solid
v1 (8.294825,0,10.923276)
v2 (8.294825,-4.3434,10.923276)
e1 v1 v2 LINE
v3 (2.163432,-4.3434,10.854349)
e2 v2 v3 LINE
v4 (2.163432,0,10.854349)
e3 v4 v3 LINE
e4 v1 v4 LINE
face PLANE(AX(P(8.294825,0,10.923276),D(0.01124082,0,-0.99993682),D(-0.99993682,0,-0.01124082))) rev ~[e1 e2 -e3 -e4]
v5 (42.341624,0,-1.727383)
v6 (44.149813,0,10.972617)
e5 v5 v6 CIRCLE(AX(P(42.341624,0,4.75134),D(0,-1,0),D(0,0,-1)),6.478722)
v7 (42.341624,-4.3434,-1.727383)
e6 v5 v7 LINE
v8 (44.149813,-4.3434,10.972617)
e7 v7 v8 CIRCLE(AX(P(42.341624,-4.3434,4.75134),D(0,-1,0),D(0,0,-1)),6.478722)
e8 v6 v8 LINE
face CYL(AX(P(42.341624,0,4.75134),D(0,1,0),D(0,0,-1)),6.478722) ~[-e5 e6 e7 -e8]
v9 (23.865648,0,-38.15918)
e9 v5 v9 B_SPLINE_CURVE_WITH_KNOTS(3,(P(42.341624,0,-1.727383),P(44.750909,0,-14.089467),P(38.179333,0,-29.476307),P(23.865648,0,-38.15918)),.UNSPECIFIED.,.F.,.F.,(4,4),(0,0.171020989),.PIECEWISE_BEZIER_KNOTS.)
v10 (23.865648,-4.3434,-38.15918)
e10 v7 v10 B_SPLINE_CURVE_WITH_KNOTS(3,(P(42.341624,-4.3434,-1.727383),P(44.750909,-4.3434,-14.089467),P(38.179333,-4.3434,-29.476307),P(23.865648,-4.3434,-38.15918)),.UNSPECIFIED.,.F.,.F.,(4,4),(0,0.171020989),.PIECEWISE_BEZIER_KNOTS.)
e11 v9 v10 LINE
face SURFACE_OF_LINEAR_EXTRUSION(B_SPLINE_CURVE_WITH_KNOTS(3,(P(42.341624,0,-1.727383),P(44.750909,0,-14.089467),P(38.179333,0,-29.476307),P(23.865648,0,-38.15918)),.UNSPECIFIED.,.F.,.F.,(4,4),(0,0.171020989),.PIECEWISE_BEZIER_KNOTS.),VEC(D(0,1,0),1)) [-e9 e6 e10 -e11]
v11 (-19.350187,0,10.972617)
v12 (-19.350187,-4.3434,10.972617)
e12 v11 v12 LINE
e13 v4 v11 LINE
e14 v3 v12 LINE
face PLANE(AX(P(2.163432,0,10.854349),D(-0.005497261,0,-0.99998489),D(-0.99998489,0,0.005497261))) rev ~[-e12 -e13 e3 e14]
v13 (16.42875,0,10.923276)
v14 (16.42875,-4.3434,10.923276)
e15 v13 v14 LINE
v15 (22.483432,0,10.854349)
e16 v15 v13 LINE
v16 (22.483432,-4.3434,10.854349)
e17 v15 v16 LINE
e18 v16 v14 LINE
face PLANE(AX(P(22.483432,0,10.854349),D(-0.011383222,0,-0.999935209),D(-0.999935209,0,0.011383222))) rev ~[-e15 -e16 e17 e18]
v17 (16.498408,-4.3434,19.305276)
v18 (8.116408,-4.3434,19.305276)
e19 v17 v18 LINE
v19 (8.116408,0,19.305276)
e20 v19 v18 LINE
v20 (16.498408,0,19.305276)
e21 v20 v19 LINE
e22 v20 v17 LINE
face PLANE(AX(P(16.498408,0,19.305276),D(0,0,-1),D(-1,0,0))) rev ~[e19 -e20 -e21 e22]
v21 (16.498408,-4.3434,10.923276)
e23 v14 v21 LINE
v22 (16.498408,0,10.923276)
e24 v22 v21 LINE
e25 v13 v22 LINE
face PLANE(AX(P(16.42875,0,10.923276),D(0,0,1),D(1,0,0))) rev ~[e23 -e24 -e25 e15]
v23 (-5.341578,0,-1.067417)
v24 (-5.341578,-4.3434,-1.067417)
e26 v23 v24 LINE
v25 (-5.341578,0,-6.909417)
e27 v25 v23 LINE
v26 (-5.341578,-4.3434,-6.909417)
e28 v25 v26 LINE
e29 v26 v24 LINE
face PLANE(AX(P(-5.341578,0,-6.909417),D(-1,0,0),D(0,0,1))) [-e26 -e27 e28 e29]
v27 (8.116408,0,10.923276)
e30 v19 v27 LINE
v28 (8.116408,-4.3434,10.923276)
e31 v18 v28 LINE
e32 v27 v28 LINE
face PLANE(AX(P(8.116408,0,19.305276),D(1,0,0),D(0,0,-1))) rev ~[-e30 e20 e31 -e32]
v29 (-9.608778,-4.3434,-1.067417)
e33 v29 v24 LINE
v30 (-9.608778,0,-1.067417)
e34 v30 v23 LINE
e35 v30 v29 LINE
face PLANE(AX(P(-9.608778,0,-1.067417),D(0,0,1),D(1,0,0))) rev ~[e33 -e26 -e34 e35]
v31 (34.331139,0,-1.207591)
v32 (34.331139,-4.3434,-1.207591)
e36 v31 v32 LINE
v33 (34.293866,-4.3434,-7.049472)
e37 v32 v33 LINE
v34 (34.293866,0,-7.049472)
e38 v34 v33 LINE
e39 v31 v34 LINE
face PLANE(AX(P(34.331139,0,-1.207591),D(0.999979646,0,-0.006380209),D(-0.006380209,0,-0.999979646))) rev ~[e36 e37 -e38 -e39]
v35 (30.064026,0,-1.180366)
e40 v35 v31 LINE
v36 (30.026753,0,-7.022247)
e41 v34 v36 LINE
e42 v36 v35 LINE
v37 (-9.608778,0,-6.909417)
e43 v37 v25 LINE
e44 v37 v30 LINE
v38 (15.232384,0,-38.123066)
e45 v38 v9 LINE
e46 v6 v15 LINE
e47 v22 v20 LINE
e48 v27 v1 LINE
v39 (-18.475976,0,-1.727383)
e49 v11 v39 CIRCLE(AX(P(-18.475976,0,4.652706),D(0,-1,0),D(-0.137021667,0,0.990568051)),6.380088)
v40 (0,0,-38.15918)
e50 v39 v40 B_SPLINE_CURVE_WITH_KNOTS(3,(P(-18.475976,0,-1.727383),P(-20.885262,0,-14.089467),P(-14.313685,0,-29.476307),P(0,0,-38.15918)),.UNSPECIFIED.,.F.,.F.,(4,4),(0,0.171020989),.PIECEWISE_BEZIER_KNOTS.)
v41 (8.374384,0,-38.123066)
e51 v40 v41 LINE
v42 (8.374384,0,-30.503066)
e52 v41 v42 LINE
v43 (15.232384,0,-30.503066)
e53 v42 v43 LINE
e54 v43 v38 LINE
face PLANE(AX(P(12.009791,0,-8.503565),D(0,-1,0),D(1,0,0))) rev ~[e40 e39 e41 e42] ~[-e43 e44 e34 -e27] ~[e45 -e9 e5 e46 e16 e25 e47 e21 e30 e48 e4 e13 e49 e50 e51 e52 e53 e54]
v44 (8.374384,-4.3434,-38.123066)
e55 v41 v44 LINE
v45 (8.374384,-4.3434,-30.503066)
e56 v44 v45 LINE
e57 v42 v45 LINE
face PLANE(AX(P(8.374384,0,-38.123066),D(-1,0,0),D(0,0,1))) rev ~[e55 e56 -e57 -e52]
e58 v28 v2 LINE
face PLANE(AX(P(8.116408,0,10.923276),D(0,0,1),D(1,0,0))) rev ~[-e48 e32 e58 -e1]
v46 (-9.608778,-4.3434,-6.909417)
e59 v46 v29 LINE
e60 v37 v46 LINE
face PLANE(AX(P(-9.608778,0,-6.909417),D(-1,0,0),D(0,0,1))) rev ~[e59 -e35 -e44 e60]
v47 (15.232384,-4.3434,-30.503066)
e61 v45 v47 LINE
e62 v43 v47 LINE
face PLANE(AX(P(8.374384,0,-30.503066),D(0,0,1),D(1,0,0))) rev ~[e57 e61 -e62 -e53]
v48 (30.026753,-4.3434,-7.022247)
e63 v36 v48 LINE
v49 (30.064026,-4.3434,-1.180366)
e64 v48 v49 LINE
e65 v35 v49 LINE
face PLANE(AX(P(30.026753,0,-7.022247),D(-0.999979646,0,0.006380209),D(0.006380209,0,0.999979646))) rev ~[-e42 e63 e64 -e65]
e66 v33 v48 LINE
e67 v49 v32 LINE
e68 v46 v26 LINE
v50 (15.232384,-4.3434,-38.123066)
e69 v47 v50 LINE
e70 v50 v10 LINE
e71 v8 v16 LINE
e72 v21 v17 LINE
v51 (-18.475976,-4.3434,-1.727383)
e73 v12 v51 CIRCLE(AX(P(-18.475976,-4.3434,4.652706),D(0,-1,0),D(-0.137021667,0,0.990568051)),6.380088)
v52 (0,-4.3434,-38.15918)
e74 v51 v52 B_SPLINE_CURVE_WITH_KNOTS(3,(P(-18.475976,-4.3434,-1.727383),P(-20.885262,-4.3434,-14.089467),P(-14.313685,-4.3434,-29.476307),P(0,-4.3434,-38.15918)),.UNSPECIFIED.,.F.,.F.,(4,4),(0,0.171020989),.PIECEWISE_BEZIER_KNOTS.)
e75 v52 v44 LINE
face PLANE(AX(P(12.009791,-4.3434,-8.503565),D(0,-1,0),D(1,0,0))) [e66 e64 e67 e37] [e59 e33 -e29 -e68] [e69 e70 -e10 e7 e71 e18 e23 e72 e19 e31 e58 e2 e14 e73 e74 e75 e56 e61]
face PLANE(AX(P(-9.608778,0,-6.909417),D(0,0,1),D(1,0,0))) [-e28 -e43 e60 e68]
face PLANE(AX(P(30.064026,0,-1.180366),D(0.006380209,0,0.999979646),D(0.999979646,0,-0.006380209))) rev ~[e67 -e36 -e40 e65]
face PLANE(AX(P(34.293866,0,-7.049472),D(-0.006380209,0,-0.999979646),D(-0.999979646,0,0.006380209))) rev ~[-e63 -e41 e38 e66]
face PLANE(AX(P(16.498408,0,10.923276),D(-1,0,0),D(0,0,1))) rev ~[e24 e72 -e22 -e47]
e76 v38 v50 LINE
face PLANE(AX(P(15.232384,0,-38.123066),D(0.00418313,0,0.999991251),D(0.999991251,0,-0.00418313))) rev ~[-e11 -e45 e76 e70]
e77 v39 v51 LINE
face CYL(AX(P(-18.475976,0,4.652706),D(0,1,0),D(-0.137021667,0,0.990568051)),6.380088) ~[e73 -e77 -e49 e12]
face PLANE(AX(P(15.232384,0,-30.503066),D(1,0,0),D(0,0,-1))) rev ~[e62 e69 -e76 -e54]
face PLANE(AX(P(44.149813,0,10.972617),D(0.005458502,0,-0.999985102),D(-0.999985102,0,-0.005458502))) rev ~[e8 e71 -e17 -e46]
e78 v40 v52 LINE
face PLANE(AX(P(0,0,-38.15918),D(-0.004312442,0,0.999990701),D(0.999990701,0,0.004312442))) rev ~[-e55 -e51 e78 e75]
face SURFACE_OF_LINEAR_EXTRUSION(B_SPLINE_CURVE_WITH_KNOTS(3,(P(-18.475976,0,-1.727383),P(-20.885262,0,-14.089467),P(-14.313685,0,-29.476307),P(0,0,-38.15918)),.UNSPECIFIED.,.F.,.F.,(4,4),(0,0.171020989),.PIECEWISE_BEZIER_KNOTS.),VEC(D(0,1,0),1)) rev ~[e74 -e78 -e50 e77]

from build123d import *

# Parameters (mm, degrees)
F0_W     = 4.2672
F0_H     = 5.842
F1_DEPTH = 4.3434


with BuildPart() as f1:
    # F0 (on Front) → F1 (new body)
    with BuildSketch(Plane.XZ):
        with BuildLine():
            Line((2.1634316072, 10.8543494716), (-19.3501866255, 10.9726172321))
            ThreePointArc((-19.3501866255, 10.9726172321), (-24.8410026739, 4.2145660489), (-18.4759762851, -1.7273827679))
            add(Edge.make_bspline(
                [(-18.4759762851, -1.7273827679), (-20.8852616932, -14.0894673655), (-14.3136853987, -29.476307077), (0, -38.1591799864)],
                knots=[0, 0, 0, 0, 0.1710209887, 0.1710209887, 0.1710209887, 0.1710209887], degree=3))
            Line((0, -38.1591799864), (8.3743836731, -38.1230656058))
            Line((8.3743836731, -38.1230656058), (8.3743836731, -30.5030656058))
            Line((8.3743836731, -30.5030656058), (12.2675002734, -30.5030656058))
            Line((12.2675002734, -30.5030656058), (15.2323836731, -30.5030656058))
            Line((15.2323836731, -30.5030656058), (15.2323836731, -38.1230656058))
            Line((15.2323836731, -38.1230656058), (23.8656476492, -38.1591799864))
            add(Edge.make_bspline(
                [(42.3416239343, -1.7273827679), (44.7509093424, -14.0894673655), (38.1793330479, -29.476307077), (23.8656476492, -38.1591799864)],
                knots=[0, 0, 0, 0, 0.1710209887, 0.1710209887, 0.1710209887, 0.1710209887], degree=3))
            ThreePointArc((42.3416239343, -1.7273827679), (48.7556622303, 3.8381273274), (44.1498133745, 10.9726172321))
            Line((44.1498133745, 10.9726172321), (22.4834316072, 10.8543494716))
            Line((22.4834316072, 10.8543494716), (16.4287500314, 10.9232757241))
            Line((16.4287500314, 10.9232757241), (16.4984082512, 10.9232757241))
            Line((16.4984082512, 10.9232757241), (16.4984082512, 19.3052757241))
            Line((16.4984082512, 19.3052757241), (8.1164082512, 19.3052757241))
            Line((8.1164082512, 19.3052757241), (8.1164082512, 10.9232757241))
            Line((8.1164082512, 10.9232757241), (8.294825498, 10.9232757241))
            Line((8.294825498, 10.9232757241), (2.1634316072, 10.8543494716))
        make_face()
        with Locations((-7.4751781712, -3.9884169885)):
            Rectangle(F0_W, F0_H, mode=Mode.SUBTRACT)
        Polygon((30.0267527077, -7.0222468014), (30.0640258865, -1.180365708), (34.331139033, -1.2075913342), (34.2938658543, -7.0494724276), align=None, mode=Mode.SUBTRACT)
    extrude(amount=F1_DEPTH)


solid = f1.part
